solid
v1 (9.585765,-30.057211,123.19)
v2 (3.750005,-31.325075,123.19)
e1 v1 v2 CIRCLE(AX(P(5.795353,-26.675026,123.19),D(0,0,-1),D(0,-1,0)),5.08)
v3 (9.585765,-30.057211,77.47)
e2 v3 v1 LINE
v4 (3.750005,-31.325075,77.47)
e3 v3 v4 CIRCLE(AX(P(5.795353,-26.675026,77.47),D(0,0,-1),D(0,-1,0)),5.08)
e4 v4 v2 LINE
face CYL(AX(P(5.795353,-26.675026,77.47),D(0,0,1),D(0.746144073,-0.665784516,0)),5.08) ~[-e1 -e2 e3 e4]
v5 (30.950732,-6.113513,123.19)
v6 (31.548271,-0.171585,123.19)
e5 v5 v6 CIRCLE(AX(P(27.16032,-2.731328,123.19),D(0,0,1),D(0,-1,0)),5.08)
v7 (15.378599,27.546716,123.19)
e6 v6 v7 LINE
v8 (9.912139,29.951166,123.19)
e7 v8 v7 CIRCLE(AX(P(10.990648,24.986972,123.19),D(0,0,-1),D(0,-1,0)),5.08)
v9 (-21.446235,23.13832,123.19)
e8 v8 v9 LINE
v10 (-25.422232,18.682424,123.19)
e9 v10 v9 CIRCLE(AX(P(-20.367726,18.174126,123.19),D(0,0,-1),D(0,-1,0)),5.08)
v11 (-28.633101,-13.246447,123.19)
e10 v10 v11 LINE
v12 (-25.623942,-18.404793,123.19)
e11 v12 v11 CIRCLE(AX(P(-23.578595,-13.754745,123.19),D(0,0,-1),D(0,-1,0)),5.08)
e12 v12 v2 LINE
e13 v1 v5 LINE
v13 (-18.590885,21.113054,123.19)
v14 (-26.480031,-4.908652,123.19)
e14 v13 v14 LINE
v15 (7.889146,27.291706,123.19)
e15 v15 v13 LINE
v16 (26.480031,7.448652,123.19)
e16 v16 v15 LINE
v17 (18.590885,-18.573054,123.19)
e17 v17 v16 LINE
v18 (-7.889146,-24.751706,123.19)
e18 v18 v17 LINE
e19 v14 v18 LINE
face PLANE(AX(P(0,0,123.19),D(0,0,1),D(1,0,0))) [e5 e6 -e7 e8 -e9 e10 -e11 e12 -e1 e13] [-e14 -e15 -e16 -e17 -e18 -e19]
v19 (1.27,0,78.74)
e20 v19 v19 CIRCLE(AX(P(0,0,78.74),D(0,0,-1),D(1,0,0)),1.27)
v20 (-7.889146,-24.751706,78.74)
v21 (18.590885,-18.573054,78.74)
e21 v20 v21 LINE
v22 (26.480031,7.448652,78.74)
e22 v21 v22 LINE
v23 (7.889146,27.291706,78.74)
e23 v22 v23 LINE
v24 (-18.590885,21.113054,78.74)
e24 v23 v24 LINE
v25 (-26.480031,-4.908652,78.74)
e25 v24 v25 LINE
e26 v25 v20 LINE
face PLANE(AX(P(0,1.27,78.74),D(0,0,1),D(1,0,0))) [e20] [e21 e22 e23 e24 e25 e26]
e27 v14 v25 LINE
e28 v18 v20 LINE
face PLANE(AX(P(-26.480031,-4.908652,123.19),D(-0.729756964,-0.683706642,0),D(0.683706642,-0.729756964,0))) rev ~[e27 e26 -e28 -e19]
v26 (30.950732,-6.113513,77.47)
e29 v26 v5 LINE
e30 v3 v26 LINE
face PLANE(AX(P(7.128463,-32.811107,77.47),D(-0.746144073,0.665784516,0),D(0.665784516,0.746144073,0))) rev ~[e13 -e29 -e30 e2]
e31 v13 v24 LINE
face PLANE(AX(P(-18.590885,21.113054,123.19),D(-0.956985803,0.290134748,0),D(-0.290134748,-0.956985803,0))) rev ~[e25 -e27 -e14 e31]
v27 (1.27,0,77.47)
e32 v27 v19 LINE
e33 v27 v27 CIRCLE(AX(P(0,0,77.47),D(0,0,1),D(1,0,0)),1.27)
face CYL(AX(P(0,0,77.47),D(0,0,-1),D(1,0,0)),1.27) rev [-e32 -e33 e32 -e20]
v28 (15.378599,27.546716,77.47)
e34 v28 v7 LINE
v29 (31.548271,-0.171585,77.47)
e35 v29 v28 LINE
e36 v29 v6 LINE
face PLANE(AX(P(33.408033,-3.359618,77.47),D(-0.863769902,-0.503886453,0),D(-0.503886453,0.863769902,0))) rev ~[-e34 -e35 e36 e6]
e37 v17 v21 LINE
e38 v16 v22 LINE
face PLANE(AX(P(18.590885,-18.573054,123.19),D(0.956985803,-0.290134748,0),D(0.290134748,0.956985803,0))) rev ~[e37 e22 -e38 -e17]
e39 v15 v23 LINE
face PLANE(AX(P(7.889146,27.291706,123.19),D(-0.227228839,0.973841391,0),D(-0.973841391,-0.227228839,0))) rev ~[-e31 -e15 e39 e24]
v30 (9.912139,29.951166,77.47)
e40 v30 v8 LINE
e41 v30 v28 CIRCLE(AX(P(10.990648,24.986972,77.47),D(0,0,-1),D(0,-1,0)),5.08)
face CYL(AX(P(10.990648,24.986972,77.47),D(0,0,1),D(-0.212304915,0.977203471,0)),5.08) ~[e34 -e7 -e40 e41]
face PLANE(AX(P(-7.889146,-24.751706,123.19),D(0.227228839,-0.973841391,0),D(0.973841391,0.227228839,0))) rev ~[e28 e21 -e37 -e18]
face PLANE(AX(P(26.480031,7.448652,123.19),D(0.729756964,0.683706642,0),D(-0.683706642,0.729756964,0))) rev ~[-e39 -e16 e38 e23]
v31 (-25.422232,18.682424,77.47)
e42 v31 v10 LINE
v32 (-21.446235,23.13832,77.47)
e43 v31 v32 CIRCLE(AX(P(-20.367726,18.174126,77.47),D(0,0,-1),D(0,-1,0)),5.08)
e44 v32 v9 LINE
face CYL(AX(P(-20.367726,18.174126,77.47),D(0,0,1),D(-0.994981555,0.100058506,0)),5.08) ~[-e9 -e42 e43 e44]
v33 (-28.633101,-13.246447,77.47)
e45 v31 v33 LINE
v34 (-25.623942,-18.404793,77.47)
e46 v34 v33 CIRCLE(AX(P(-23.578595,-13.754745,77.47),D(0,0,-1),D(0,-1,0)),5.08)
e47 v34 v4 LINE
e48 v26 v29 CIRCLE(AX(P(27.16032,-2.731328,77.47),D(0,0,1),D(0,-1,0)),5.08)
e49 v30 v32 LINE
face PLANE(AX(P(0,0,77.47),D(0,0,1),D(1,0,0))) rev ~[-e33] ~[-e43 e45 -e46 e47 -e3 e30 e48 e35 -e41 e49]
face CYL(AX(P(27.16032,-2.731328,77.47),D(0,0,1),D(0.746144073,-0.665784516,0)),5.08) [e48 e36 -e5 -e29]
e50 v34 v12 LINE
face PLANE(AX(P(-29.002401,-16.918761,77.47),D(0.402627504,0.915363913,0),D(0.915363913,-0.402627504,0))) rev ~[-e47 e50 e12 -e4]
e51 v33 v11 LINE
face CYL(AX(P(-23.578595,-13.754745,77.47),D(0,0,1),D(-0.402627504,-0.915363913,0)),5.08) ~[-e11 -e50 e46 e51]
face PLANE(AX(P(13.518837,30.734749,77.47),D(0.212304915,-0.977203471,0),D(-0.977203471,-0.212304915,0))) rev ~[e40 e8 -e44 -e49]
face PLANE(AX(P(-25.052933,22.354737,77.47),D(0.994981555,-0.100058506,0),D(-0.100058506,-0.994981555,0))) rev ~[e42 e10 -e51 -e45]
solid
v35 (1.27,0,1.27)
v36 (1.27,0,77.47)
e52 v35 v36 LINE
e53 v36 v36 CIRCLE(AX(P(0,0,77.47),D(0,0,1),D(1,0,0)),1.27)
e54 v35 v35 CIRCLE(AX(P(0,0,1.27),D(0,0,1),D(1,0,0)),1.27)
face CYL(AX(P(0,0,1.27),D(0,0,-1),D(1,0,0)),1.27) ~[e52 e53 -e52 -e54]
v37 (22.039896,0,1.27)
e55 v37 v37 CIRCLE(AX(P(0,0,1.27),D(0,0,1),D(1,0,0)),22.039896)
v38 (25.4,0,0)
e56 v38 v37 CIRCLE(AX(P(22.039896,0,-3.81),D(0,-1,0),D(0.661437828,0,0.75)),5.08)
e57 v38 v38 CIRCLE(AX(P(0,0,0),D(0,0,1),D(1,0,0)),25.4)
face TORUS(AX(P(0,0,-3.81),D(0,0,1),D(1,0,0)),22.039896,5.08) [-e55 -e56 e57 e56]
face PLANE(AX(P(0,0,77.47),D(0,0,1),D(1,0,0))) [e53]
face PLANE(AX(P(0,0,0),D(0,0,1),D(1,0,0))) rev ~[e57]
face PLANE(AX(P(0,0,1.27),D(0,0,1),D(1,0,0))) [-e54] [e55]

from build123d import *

# Parameters (mm, degrees)
F0_R     = 25.4
F1_DEPTH = 1.27
F3_R     = 1.27
F4_DEPTH = 76.2
F5_R     = 1.27
F6_DEPTH = 45.72
F8_DEPTH = 44.45
F9_R     = 5.08
F10_R    = 5.08
F11_R    = 5.08
F12_R    = 5.08
F13_R    = 5.08


# Not quite as in the source:
# - a fillet or chamfer that OpenCascade refuses, or shapes differently, is made with other operations: its cross-section is extruded or revolved along the edge and cut away or added


with BuildPart() as f1:
    # F0 (on Top) → F1 (new body)
    with BuildSketch(Plane.XY):
        Circle(F0_R)
    extrude(amount=F1_DEPTH)

    # F2: fillet of radius 5.08 on 1 edges, made by hand

    # F2_s1 → F2_t2 (revolve, cut)
    with BuildSketch(Plane.XZ):
        with BuildLine():
            ThreePointArc((25.4, 0), (23.8359470592, 0.9419048812), (22.0398958349, 1.27))
            Line((22.0398958349, 1.27), (25.4, 1.27))
            Line((25.4, 1.27), (25.4, 0))
        make_face()
    revolve(axis=Axis((0, 0, 1.27), (0, 0, 1)), mode=Mode.SUBTRACT)

    # F3 (on face) → F4 (join)
    with BuildSketch(Plane.XY.offset(1.27)):
        Circle(F3_R)
    extrude(amount=F4_DEPTH)


with BuildPart() as f6:
    # F5 (on face) → F6 (new body)
    with BuildSketch(Plane.XY.offset(77.47)):
        Polygon((7.1284634836, -32.8111068162), (33.4080333046, -3.3596179632), (13.5188365959, 30.7347487257), (-25.0529328, 22.3547373114), (-29.0024005842, -16.9187612577), align=None)
        Circle(F5_R, mode=Mode.SUBTRACT)
    extrude(amount=F6_DEPTH)

    # F7 (on face) → F8 (cut)
    with BuildSketch(Plane.XY.offset(123.19)):
        Polygon((18.5908850385, -18.5730540045), (26.4800313758, 7.4486517199), (7.8891463373, 27.2917057244), (-18.5908850385, 21.1130540045), (-26.4800313758, -4.9086517199), (-7.8891463373, -24.7517057244), align=None)
    extrude(amount=-F8_DEPTH, mode=Mode.SUBTRACT)

    # F9
    f9_edges = [f6.edges().sort_by_distance(p)[0] for p in [
        (33.408033, -3.359618, 100.33),
    ]]
    fillet(f9_edges, radius=F9_R)

    # F10
    f10_edges = [f6.edges().sort_by_distance(p)[0] for p in [
        (7.128463, -32.811107, 100.33),
    ]]
    fillet(f10_edges, radius=F10_R)

    # F11
    f11_edges = [f6.edges().sort_by_distance(p)[0] for p in [
        (-29.002401, -16.918761, 100.33),
    ]]
    fillet(f11_edges, radius=F11_R)

    # F12
    f12_edges = [f6.edges().sort_by_distance(p)[0] for p in [
        (-25.052933, 22.354737, 100.33),
    ]]
    fillet(f12_edges, radius=F12_R)

    # F13
    f13_edges = [f6.edges().sort_by_distance(p)[0] for p in [
        (13.518837, 30.734749, 100.33),
    ]]
    fillet(f13_edges, radius=F13_R)


solid = Compound([f1.part, f6.part])
